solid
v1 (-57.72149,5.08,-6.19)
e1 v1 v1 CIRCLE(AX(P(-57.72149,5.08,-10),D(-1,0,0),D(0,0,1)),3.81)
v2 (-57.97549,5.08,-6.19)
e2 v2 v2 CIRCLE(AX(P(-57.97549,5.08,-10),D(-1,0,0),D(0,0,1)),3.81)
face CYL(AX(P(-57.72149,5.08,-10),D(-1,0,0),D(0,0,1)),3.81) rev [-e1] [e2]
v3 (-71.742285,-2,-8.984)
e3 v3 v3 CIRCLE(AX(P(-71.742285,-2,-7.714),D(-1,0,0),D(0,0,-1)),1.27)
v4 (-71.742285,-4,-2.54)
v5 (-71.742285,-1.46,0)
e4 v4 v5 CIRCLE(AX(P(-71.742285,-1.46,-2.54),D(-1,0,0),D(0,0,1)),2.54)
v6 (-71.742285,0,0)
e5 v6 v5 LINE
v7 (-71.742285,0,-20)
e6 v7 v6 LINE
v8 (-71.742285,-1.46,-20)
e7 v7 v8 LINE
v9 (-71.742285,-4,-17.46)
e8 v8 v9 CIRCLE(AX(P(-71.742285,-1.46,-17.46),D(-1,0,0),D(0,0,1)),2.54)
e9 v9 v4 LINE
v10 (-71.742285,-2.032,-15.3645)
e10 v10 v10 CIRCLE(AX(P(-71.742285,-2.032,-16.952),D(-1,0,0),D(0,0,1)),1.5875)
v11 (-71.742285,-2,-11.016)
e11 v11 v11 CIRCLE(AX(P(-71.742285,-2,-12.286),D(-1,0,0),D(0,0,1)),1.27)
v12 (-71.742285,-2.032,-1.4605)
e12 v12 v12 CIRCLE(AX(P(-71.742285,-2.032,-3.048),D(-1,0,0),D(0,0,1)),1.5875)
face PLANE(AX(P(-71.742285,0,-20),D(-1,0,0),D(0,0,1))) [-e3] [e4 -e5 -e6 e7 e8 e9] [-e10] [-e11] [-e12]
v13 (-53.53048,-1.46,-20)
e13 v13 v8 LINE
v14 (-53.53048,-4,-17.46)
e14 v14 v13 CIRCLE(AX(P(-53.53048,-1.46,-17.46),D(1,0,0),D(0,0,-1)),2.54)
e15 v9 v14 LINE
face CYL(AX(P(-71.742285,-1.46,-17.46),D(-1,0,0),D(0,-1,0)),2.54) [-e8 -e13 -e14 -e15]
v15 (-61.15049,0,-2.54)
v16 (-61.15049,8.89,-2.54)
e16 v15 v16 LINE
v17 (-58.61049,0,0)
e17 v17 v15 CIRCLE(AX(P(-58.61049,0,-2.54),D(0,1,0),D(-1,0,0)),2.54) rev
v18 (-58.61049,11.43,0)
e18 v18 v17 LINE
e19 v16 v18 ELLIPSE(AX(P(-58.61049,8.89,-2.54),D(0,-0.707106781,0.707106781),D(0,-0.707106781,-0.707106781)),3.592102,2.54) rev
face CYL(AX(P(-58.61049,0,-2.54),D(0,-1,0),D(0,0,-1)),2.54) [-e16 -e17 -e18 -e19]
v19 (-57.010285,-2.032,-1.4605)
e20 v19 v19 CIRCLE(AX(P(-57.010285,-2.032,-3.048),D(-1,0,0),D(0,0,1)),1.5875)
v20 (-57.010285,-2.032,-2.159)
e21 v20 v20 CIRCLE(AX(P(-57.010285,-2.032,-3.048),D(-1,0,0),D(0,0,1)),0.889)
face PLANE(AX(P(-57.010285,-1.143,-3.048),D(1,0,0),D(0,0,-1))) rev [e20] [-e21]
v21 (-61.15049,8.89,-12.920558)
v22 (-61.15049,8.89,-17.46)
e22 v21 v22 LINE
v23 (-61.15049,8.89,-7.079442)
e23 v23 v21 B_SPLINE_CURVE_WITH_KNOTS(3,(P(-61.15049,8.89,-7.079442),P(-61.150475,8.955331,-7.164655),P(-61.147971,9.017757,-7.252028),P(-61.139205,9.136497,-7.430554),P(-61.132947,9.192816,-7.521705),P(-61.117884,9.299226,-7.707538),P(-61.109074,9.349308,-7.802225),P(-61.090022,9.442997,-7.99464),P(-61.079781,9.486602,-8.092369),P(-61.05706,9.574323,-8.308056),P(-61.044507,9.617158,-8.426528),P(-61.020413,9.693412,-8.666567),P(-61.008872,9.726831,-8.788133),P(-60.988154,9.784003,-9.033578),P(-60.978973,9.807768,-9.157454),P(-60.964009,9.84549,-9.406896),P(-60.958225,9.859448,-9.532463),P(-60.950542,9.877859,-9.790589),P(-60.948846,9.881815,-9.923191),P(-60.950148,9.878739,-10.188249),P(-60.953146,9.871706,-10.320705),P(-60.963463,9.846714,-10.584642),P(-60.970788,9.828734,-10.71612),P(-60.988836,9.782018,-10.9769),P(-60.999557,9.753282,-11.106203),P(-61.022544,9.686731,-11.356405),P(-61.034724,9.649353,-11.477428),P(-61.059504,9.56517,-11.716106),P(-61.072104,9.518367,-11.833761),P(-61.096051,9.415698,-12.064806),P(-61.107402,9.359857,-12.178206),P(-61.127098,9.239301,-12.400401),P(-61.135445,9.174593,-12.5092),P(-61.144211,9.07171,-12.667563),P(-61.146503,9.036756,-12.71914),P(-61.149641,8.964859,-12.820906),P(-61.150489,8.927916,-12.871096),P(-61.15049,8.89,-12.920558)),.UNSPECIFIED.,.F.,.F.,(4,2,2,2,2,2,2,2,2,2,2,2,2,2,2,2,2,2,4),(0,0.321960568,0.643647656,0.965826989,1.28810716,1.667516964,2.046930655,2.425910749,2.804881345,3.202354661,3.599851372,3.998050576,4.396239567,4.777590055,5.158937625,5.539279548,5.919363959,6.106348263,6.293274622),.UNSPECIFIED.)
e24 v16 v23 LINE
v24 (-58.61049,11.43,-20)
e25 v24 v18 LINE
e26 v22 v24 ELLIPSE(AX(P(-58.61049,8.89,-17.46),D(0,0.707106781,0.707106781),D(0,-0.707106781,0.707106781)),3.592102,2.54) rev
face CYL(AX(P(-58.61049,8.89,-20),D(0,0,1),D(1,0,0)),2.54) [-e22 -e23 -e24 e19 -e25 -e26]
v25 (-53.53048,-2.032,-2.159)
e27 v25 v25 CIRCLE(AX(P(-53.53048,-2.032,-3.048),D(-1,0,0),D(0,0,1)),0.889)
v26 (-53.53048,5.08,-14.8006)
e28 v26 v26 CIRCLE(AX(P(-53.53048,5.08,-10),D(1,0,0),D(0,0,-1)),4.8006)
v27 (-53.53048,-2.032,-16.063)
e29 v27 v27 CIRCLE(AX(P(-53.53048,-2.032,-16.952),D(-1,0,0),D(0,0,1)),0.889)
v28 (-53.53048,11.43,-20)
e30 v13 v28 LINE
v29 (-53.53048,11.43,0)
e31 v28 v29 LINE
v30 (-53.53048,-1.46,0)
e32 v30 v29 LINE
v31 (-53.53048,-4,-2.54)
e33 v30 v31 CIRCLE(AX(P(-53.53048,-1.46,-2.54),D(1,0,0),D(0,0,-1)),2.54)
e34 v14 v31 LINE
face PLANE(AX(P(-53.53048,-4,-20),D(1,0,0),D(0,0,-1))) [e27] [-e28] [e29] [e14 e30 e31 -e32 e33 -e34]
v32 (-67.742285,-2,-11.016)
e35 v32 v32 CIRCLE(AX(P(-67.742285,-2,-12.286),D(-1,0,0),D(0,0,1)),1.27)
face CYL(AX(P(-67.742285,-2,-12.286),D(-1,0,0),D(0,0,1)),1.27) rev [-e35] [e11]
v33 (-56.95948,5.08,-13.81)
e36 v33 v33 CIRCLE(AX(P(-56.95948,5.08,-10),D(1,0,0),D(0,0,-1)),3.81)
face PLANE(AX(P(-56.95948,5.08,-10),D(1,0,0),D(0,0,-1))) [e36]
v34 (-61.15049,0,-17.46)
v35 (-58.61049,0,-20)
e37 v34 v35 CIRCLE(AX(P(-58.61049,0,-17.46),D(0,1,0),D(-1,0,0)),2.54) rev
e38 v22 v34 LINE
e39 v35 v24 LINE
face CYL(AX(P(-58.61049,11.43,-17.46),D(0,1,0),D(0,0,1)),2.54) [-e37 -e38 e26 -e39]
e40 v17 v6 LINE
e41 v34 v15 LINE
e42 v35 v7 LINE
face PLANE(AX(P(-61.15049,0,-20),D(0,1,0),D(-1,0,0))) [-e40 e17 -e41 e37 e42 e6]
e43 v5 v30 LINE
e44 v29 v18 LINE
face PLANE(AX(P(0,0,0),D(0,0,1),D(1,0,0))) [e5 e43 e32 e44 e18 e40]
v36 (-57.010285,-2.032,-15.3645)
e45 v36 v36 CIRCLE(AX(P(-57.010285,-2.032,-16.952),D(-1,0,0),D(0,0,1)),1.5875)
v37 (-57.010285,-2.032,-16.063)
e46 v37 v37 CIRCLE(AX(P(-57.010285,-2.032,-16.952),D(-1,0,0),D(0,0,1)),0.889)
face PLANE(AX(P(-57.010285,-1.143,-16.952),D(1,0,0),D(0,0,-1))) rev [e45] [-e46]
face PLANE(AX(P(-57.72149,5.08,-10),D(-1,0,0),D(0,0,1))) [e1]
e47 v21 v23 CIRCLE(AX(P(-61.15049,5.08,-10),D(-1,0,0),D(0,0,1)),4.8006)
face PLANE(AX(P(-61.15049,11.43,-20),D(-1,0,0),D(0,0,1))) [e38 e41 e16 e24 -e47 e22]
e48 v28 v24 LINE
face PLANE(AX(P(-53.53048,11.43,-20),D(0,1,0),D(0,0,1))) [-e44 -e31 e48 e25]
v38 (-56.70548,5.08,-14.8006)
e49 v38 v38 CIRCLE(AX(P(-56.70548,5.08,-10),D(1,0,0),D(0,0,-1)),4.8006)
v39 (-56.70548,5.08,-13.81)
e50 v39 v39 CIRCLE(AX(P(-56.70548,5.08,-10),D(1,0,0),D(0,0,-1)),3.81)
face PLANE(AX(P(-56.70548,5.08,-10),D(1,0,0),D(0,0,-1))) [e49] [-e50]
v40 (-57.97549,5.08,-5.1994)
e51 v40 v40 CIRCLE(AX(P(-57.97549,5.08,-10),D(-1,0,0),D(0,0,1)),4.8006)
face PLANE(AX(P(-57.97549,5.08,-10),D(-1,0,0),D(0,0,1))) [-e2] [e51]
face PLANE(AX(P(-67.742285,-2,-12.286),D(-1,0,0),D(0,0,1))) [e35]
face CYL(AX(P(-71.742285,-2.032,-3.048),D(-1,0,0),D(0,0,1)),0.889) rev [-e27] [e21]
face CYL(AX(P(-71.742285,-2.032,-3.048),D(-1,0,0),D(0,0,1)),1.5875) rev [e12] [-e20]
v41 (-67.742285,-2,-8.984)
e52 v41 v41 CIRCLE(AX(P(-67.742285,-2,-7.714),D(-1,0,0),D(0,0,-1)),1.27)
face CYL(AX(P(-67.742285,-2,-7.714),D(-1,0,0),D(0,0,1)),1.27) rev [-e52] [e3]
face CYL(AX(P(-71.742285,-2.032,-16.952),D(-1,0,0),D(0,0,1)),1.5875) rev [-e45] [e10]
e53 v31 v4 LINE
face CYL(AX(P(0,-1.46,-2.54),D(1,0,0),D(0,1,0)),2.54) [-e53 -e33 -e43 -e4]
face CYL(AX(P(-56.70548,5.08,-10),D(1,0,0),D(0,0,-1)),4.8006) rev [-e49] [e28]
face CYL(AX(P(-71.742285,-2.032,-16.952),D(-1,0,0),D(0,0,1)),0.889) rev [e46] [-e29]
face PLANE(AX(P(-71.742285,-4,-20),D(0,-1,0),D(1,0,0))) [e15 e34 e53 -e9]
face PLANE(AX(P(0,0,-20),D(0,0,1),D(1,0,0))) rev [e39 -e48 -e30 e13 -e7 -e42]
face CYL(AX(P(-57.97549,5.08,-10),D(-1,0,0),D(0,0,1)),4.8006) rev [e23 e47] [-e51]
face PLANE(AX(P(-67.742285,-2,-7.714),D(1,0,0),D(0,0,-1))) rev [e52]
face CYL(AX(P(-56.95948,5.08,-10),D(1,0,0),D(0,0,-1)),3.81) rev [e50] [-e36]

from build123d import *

# Parameters (mm, degrees)
BOSS_EXTRUDE1_DEPTH                            = 20
SKETCH2_R                                      = 1.27
CUT_EXTRUDE1_DEPTH                             = 4.000000128
SKETCH3_R                                      = 4.8006
CUT_EXTRUDE2_DEPTH                             = 3.175
SKETCH4_R                                      = 3.81
CUT_EXTRUDE3_DEPTH                             = 0.254
CUT_EXTRUDE4_START                             = -3.175
SKETCH5_R                                      = 4.8006
CUT_EXTRUDE4_DEPTH                             = 3.175
CUT_EXTRUDE5_START                             = -0.254
SKETCH6_R                                      = 3.81
CUT_EXTRUDE5_DEPTH                             = 0.254
CBORE_FOR_0_SOCKET_HEAD_CAP_SCREW1_D           = 1.778
CBORE_FOR_0_SOCKET_HEAD_CAP_SCREW1_CBORE_D     = 3.175
CBORE_FOR_0_SOCKET_HEAD_CAP_SCREW1_CBORE_DEPTH = 14.732
FILLET1_R                                      = 2.54


with BuildPart() as part:
    # Sketch1 → Boss-Extrude1 (new body)
    with BuildSketch(Plane.XY):
        Polygon((-71.742285041, 0), (-71.742285041, -4), (-53.530479711, -4), (-53.530479711, 11.43), (-61.150490131, 11.43), (-61.150490131, 0), align=None)
    extrude(amount=-BOSS_EXTRUDE1_DEPTH)

    # Sketch2 → Cut-Extrude1 (cut)
    with BuildSketch(Plane.ZY.offset(71.742285041)):
        with Locations((-12.286, -2)):
            Circle(SKETCH2_R)
        with Locations(Location((-7.714, -2, 0), (0, 0, 180))):
            Circle(SKETCH2_R)
    extrude(amount=-CUT_EXTRUDE1_DEPTH, mode=Mode.SUBTRACT)

    # Sketch3 → Cut-Extrude2 (cut)
    with BuildSketch(Plane.ZY.offset(61.150490131)):
        with Locations((-10, 5.08)):
            Circle(SKETCH3_R)
    extrude(amount=-CUT_EXTRUDE2_DEPTH, mode=Mode.SUBTRACT)

    # Sketch4 → Cut-Extrude3 (cut)
    with BuildSketch(Plane.ZY.offset(57.975490131)):
        with Locations((-10, 5.08)):
            Circle(SKETCH4_R)
    extrude(amount=-CUT_EXTRUDE3_DEPTH, mode=Mode.SUBTRACT)

    # Sketch5 → Cut-Extrude4 (cut)
    with BuildSketch(Plane(origin=(-53.530479711, 0, 0), x_dir=(0, 0, -1), z_dir=(1, 0, 0)).offset(CUT_EXTRUDE4_START)):
        with Locations(Location((10, 5.08, 0), (0, 0, 180))):
            Circle(SKETCH5_R)
    extrude(amount=CUT_EXTRUDE4_DEPTH, mode=Mode.SUBTRACT)

    # Sketch6 → Cut-Extrude5 (cut)
    with BuildSketch(Plane(origin=(-56.705479711, 0, 0), x_dir=(0, 0, -1), z_dir=(1, 0, 0)).offset(CUT_EXTRUDE5_START)):
        with Locations(Location((10, 5.08, 0), (0, 0, 180))):
            Circle(SKETCH6_R)
    extrude(amount=CUT_EXTRUDE5_DEPTH, mode=Mode.SUBTRACT)

    # CBORE for #0 Socket Head Cap Screw1 (through all)
    with Locations(Plane.ZY.offset(71.742285041)):
        with Locations((-16.952, -2.032), (-3.048, -2.032)):
            CounterBoreHole(CBORE_FOR_0_SOCKET_HEAD_CAP_SCREW1_D / 2, CBORE_FOR_0_SOCKET_HEAD_CAP_SCREW1_CBORE_D / 2, CBORE_FOR_0_SOCKET_HEAD_CAP_SCREW1_CBORE_DEPTH)

    # Fillet1
    # the kernel refuses this fillet: 2.54 mm, written as the material it takes off along each edge
    with BuildSketch(Plane(origin=(-78.092285041, -4, -20), x_dir=(0, 1, 0), z_dir=(1, 0, 0))) as fillet1_piece_1:
        with BuildLine():
            CenterArc((FILLET1_R, FILLET1_R), FILLET1_R, 180, 90)
            Line((0, FILLET1_R), (0, 0))
            Line((0, 0), (FILLET1_R, 0))
        make_face()
    extrude(amount=30.91180533, mode=Mode.SUBTRACT)
    with BuildSketch(Plane(origin=(-61.150490131, 11.43, 6.35), x_dir=(0, -1, 0), z_dir=(0, 0, -1))) as fillet1_piece_2:
        with BuildLine():
            CenterArc((FILLET1_R, -FILLET1_R), FILLET1_R, 90, 90)
            Line((0, -FILLET1_R), (0, 0))
            Line((0, 0), (FILLET1_R, 0))
        make_face()
    extrude(amount=32.7, mode=Mode.SUBTRACT)
    with BuildSketch(Plane(origin=(-61.150490131, 17.78, -20), x_dir=(1, 0, 0), z_dir=(0, -1, 0))) as fillet1_piece_3:
        with BuildLine():
            CenterArc((FILLET1_R, FILLET1_R), FILLET1_R, 180, 90)
            Line((0, FILLET1_R), (0, 0))
            Line((0, 0), (FILLET1_R, 0))
        make_face()
    extrude(amount=17.78, mode=Mode.SUBTRACT)
    with BuildSketch(Plane(origin=(-61.150490131, 17.78, 0), x_dir=(1, 0, 0), z_dir=(0, -1, 0))) as fillet1_piece_4:
        with BuildLine():
            CenterArc((FILLET1_R, -FILLET1_R), FILLET1_R, 90, 90)
            Line((0, -FILLET1_R), (0, 0))
            Line((0, 0), (FILLET1_R, 0))
        make_face()
    extrude(amount=17.78, mode=Mode.SUBTRACT)
    with BuildSketch(Plane(origin=(-78.092285041, -4, 0), x_dir=(0, 1, 0), z_dir=(1, 0, 0))) as fillet1_piece_5:
        with BuildLine():
            CenterArc((FILLET1_R, -FILLET1_R), FILLET1_R, 90, 90)
            Line((0, -FILLET1_R), (0, 0))
            Line((0, 0), (FILLET1_R, 0))
        make_face()
    extrude(amount=30.91180533, mode=Mode.SUBTRACT)


solid = part.part
